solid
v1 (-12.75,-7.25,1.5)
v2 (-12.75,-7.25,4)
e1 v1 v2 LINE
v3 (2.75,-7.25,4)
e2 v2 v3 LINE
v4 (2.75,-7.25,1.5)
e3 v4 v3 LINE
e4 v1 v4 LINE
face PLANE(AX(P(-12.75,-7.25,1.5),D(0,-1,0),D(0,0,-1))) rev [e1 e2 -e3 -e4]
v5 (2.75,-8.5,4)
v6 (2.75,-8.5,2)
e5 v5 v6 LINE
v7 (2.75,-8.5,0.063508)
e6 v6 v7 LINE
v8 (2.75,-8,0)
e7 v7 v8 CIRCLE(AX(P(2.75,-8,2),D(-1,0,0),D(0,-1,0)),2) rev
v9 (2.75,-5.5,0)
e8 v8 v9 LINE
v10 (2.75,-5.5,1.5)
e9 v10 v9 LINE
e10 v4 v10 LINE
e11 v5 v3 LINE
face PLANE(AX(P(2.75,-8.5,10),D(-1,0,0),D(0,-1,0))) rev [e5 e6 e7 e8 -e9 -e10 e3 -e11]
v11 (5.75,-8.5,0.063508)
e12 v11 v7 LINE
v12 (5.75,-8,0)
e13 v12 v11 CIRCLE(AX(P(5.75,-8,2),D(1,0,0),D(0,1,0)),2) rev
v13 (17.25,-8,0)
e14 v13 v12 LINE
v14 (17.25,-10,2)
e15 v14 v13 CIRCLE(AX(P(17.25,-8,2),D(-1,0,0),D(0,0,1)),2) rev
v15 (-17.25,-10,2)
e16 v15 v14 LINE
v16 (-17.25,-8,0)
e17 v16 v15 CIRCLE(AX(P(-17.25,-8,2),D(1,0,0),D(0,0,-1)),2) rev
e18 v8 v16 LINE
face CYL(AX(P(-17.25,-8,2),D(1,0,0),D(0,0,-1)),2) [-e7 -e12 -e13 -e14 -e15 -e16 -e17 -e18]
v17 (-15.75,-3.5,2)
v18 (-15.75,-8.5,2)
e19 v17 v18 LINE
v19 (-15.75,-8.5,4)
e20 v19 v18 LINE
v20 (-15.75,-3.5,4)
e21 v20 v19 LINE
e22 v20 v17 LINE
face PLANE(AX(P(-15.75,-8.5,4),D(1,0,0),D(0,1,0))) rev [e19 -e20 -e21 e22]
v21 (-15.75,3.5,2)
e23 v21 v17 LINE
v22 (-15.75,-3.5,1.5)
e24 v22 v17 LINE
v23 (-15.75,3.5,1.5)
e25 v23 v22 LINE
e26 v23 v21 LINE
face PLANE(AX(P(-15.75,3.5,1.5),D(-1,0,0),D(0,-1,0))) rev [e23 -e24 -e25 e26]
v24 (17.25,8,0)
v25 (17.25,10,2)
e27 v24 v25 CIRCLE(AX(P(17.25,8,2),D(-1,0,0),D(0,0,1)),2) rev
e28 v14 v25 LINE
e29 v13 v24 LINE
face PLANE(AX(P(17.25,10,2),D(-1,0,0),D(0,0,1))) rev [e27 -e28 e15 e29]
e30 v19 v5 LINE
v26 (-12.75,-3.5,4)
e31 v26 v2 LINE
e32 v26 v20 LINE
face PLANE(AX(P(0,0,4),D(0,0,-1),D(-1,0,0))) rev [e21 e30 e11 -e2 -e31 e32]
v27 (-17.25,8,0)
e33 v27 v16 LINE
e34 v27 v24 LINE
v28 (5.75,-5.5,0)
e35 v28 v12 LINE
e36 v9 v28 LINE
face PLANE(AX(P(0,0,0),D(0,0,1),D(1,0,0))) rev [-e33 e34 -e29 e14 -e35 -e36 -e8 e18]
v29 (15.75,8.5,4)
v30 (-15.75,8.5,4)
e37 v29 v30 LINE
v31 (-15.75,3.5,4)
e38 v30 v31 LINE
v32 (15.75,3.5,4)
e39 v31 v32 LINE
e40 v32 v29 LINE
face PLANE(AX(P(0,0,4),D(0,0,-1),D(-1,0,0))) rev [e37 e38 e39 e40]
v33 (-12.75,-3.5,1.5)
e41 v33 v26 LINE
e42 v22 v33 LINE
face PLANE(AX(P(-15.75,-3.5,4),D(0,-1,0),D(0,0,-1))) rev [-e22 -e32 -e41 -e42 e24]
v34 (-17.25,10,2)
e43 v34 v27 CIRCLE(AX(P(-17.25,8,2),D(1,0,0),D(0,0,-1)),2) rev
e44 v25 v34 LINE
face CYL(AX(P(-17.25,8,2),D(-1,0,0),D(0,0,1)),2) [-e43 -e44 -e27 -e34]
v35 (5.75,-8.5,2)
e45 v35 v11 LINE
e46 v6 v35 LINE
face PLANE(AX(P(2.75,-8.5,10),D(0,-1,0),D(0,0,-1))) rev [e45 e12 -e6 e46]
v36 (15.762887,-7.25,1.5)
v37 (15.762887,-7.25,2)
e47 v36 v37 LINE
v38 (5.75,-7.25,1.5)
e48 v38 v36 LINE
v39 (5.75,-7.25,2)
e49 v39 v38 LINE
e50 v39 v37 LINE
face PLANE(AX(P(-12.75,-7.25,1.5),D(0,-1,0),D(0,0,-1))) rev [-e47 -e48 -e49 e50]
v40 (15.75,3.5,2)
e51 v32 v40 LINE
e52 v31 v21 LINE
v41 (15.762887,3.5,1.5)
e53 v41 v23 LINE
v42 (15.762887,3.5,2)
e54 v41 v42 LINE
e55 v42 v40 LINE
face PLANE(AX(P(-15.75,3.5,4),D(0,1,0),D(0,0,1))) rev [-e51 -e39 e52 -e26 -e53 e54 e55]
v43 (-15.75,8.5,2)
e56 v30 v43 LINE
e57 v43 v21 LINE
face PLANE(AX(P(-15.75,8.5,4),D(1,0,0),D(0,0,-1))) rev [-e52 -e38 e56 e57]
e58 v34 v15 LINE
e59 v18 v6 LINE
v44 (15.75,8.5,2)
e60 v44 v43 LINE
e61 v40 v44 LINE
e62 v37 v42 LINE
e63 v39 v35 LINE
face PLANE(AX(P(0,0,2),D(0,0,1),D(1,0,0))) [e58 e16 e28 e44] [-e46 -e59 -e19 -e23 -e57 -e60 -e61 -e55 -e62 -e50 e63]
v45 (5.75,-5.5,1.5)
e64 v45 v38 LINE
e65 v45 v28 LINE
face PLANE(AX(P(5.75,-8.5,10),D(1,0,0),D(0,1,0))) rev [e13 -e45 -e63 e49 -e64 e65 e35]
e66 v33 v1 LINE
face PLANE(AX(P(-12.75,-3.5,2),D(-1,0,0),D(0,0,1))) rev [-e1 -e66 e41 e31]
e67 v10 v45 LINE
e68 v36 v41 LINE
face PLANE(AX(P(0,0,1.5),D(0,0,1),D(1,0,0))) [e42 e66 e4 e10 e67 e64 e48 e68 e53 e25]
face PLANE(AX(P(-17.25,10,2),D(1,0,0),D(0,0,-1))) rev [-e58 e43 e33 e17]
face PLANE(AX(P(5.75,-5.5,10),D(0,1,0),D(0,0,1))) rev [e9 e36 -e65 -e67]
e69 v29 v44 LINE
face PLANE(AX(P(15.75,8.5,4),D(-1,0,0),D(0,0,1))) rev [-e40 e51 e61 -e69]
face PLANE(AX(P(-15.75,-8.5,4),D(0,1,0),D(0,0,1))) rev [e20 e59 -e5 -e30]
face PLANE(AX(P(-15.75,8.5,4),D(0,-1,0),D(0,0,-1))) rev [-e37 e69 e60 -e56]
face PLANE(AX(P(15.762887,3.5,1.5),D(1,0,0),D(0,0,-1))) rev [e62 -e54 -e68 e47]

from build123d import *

# Parameters (mm, degrees)
SKETCH1_W           = 34.5
SKETCH1_H           = 20
BOSS_EXTRUDE1_DEPTH = 2
SKETCH2_W           = 31.5
SKETCH2_H           = 5
BOSS_EXTRUDE2_DEPTH = 2
SKETCH3_W           = 3
SKETCH3_H           = 3
CUT_EXTRUDE1_DEPTH  = 10
FILLET1_R           = 2
CUT_EXTRUDE2_DEPTH  = 2
CUT_EXTRUDE3_DEPTH  = 2.5


with BuildPart() as part:
    # Sketch1 → Boss-Extrude1 (new body)
    with BuildSketch(Plane.XY):
        Rectangle(SKETCH1_W, SKETCH1_H)
    extrude(amount=BOSS_EXTRUDE1_DEPTH)

    # Sketch2 → Boss-Extrude2 (add)
    with BuildSketch(Plane.XY.offset(2)):
        with Locations((0, 6)):
            Rectangle(SKETCH2_W, SKETCH2_H)
        with Locations((0, -6)):
            Rectangle(SKETCH2_W, SKETCH2_H)
    extrude(amount=BOSS_EXTRUDE2_DEPTH)

    # Sketch3 → Cut-Extrude1 (cut)
    with BuildSketch(Plane(origin=(0, 0, 0), x_dir=(-1, 0, 0), z_dir=(0, 0, -1))):
        with Locations((-4.25, -7)):
            Rectangle(SKETCH3_W, SKETCH3_H)
    extrude(amount=-CUT_EXTRUDE1_DEPTH, mode=Mode.SUBTRACT)

    # Fillet1
    # the kernel refuses this fillet: 2 mm, written as the material it takes off along each edge
    with BuildSketch(Plane(origin=(22.25, -10, 0), x_dir=(0, 1, 0), z_dir=(-1, 0, 0))) as fillet1_piece_1:
        with BuildLine():
            CenterArc((FILLET1_R, -FILLET1_R), FILLET1_R, 90, 90)
            Line((0, -FILLET1_R), (0, 0))
            Line((0, 0), (FILLET1_R, 0))
        make_face()
    extrude(amount=44.5, mode=Mode.SUBTRACT)
    with BuildSketch(Plane(origin=(-22.25, 10, 0), x_dir=(0, 0, 1), z_dir=(1, 0, 0))) as fillet1_piece_2:
        with BuildLine():
            CenterArc((FILLET1_R, FILLET1_R), FILLET1_R, 180, 90)
            Line((0, FILLET1_R), (0, 0))
            Line((0, 0), (FILLET1_R, 0))
        make_face()
    extrude(amount=44.5, mode=Mode.SUBTRACT)

    # Sketch4 → Cut-Extrude2 (cut)
    with BuildSketch(Plane.XY.offset(4)):
        Polygon((15.75, -8.5), (5.75, -8.5), (5.75, -5.5), (-12.75, -5.5), (-12.75, -3.5), (5.75, -3.5), (15.75, -3.5), align=None)
    extrude(amount=-CUT_EXTRUDE2_DEPTH, mode=Mode.SUBTRACT)

    # Sketch6 → Cut-Extrude3 (cut)
    with BuildSketch(Plane.XY.offset(4)):
        Polygon((-15.75, 3.5), (15.762886562, 3.5), (15.762886562, -7.25), (-12.75, -7.25), (-12.75, -3.5), (-15.75, -3.5), align=None)
    extrude(amount=-CUT_EXTRUDE3_DEPTH, mode=Mode.SUBTRACT)


solid = part.part
